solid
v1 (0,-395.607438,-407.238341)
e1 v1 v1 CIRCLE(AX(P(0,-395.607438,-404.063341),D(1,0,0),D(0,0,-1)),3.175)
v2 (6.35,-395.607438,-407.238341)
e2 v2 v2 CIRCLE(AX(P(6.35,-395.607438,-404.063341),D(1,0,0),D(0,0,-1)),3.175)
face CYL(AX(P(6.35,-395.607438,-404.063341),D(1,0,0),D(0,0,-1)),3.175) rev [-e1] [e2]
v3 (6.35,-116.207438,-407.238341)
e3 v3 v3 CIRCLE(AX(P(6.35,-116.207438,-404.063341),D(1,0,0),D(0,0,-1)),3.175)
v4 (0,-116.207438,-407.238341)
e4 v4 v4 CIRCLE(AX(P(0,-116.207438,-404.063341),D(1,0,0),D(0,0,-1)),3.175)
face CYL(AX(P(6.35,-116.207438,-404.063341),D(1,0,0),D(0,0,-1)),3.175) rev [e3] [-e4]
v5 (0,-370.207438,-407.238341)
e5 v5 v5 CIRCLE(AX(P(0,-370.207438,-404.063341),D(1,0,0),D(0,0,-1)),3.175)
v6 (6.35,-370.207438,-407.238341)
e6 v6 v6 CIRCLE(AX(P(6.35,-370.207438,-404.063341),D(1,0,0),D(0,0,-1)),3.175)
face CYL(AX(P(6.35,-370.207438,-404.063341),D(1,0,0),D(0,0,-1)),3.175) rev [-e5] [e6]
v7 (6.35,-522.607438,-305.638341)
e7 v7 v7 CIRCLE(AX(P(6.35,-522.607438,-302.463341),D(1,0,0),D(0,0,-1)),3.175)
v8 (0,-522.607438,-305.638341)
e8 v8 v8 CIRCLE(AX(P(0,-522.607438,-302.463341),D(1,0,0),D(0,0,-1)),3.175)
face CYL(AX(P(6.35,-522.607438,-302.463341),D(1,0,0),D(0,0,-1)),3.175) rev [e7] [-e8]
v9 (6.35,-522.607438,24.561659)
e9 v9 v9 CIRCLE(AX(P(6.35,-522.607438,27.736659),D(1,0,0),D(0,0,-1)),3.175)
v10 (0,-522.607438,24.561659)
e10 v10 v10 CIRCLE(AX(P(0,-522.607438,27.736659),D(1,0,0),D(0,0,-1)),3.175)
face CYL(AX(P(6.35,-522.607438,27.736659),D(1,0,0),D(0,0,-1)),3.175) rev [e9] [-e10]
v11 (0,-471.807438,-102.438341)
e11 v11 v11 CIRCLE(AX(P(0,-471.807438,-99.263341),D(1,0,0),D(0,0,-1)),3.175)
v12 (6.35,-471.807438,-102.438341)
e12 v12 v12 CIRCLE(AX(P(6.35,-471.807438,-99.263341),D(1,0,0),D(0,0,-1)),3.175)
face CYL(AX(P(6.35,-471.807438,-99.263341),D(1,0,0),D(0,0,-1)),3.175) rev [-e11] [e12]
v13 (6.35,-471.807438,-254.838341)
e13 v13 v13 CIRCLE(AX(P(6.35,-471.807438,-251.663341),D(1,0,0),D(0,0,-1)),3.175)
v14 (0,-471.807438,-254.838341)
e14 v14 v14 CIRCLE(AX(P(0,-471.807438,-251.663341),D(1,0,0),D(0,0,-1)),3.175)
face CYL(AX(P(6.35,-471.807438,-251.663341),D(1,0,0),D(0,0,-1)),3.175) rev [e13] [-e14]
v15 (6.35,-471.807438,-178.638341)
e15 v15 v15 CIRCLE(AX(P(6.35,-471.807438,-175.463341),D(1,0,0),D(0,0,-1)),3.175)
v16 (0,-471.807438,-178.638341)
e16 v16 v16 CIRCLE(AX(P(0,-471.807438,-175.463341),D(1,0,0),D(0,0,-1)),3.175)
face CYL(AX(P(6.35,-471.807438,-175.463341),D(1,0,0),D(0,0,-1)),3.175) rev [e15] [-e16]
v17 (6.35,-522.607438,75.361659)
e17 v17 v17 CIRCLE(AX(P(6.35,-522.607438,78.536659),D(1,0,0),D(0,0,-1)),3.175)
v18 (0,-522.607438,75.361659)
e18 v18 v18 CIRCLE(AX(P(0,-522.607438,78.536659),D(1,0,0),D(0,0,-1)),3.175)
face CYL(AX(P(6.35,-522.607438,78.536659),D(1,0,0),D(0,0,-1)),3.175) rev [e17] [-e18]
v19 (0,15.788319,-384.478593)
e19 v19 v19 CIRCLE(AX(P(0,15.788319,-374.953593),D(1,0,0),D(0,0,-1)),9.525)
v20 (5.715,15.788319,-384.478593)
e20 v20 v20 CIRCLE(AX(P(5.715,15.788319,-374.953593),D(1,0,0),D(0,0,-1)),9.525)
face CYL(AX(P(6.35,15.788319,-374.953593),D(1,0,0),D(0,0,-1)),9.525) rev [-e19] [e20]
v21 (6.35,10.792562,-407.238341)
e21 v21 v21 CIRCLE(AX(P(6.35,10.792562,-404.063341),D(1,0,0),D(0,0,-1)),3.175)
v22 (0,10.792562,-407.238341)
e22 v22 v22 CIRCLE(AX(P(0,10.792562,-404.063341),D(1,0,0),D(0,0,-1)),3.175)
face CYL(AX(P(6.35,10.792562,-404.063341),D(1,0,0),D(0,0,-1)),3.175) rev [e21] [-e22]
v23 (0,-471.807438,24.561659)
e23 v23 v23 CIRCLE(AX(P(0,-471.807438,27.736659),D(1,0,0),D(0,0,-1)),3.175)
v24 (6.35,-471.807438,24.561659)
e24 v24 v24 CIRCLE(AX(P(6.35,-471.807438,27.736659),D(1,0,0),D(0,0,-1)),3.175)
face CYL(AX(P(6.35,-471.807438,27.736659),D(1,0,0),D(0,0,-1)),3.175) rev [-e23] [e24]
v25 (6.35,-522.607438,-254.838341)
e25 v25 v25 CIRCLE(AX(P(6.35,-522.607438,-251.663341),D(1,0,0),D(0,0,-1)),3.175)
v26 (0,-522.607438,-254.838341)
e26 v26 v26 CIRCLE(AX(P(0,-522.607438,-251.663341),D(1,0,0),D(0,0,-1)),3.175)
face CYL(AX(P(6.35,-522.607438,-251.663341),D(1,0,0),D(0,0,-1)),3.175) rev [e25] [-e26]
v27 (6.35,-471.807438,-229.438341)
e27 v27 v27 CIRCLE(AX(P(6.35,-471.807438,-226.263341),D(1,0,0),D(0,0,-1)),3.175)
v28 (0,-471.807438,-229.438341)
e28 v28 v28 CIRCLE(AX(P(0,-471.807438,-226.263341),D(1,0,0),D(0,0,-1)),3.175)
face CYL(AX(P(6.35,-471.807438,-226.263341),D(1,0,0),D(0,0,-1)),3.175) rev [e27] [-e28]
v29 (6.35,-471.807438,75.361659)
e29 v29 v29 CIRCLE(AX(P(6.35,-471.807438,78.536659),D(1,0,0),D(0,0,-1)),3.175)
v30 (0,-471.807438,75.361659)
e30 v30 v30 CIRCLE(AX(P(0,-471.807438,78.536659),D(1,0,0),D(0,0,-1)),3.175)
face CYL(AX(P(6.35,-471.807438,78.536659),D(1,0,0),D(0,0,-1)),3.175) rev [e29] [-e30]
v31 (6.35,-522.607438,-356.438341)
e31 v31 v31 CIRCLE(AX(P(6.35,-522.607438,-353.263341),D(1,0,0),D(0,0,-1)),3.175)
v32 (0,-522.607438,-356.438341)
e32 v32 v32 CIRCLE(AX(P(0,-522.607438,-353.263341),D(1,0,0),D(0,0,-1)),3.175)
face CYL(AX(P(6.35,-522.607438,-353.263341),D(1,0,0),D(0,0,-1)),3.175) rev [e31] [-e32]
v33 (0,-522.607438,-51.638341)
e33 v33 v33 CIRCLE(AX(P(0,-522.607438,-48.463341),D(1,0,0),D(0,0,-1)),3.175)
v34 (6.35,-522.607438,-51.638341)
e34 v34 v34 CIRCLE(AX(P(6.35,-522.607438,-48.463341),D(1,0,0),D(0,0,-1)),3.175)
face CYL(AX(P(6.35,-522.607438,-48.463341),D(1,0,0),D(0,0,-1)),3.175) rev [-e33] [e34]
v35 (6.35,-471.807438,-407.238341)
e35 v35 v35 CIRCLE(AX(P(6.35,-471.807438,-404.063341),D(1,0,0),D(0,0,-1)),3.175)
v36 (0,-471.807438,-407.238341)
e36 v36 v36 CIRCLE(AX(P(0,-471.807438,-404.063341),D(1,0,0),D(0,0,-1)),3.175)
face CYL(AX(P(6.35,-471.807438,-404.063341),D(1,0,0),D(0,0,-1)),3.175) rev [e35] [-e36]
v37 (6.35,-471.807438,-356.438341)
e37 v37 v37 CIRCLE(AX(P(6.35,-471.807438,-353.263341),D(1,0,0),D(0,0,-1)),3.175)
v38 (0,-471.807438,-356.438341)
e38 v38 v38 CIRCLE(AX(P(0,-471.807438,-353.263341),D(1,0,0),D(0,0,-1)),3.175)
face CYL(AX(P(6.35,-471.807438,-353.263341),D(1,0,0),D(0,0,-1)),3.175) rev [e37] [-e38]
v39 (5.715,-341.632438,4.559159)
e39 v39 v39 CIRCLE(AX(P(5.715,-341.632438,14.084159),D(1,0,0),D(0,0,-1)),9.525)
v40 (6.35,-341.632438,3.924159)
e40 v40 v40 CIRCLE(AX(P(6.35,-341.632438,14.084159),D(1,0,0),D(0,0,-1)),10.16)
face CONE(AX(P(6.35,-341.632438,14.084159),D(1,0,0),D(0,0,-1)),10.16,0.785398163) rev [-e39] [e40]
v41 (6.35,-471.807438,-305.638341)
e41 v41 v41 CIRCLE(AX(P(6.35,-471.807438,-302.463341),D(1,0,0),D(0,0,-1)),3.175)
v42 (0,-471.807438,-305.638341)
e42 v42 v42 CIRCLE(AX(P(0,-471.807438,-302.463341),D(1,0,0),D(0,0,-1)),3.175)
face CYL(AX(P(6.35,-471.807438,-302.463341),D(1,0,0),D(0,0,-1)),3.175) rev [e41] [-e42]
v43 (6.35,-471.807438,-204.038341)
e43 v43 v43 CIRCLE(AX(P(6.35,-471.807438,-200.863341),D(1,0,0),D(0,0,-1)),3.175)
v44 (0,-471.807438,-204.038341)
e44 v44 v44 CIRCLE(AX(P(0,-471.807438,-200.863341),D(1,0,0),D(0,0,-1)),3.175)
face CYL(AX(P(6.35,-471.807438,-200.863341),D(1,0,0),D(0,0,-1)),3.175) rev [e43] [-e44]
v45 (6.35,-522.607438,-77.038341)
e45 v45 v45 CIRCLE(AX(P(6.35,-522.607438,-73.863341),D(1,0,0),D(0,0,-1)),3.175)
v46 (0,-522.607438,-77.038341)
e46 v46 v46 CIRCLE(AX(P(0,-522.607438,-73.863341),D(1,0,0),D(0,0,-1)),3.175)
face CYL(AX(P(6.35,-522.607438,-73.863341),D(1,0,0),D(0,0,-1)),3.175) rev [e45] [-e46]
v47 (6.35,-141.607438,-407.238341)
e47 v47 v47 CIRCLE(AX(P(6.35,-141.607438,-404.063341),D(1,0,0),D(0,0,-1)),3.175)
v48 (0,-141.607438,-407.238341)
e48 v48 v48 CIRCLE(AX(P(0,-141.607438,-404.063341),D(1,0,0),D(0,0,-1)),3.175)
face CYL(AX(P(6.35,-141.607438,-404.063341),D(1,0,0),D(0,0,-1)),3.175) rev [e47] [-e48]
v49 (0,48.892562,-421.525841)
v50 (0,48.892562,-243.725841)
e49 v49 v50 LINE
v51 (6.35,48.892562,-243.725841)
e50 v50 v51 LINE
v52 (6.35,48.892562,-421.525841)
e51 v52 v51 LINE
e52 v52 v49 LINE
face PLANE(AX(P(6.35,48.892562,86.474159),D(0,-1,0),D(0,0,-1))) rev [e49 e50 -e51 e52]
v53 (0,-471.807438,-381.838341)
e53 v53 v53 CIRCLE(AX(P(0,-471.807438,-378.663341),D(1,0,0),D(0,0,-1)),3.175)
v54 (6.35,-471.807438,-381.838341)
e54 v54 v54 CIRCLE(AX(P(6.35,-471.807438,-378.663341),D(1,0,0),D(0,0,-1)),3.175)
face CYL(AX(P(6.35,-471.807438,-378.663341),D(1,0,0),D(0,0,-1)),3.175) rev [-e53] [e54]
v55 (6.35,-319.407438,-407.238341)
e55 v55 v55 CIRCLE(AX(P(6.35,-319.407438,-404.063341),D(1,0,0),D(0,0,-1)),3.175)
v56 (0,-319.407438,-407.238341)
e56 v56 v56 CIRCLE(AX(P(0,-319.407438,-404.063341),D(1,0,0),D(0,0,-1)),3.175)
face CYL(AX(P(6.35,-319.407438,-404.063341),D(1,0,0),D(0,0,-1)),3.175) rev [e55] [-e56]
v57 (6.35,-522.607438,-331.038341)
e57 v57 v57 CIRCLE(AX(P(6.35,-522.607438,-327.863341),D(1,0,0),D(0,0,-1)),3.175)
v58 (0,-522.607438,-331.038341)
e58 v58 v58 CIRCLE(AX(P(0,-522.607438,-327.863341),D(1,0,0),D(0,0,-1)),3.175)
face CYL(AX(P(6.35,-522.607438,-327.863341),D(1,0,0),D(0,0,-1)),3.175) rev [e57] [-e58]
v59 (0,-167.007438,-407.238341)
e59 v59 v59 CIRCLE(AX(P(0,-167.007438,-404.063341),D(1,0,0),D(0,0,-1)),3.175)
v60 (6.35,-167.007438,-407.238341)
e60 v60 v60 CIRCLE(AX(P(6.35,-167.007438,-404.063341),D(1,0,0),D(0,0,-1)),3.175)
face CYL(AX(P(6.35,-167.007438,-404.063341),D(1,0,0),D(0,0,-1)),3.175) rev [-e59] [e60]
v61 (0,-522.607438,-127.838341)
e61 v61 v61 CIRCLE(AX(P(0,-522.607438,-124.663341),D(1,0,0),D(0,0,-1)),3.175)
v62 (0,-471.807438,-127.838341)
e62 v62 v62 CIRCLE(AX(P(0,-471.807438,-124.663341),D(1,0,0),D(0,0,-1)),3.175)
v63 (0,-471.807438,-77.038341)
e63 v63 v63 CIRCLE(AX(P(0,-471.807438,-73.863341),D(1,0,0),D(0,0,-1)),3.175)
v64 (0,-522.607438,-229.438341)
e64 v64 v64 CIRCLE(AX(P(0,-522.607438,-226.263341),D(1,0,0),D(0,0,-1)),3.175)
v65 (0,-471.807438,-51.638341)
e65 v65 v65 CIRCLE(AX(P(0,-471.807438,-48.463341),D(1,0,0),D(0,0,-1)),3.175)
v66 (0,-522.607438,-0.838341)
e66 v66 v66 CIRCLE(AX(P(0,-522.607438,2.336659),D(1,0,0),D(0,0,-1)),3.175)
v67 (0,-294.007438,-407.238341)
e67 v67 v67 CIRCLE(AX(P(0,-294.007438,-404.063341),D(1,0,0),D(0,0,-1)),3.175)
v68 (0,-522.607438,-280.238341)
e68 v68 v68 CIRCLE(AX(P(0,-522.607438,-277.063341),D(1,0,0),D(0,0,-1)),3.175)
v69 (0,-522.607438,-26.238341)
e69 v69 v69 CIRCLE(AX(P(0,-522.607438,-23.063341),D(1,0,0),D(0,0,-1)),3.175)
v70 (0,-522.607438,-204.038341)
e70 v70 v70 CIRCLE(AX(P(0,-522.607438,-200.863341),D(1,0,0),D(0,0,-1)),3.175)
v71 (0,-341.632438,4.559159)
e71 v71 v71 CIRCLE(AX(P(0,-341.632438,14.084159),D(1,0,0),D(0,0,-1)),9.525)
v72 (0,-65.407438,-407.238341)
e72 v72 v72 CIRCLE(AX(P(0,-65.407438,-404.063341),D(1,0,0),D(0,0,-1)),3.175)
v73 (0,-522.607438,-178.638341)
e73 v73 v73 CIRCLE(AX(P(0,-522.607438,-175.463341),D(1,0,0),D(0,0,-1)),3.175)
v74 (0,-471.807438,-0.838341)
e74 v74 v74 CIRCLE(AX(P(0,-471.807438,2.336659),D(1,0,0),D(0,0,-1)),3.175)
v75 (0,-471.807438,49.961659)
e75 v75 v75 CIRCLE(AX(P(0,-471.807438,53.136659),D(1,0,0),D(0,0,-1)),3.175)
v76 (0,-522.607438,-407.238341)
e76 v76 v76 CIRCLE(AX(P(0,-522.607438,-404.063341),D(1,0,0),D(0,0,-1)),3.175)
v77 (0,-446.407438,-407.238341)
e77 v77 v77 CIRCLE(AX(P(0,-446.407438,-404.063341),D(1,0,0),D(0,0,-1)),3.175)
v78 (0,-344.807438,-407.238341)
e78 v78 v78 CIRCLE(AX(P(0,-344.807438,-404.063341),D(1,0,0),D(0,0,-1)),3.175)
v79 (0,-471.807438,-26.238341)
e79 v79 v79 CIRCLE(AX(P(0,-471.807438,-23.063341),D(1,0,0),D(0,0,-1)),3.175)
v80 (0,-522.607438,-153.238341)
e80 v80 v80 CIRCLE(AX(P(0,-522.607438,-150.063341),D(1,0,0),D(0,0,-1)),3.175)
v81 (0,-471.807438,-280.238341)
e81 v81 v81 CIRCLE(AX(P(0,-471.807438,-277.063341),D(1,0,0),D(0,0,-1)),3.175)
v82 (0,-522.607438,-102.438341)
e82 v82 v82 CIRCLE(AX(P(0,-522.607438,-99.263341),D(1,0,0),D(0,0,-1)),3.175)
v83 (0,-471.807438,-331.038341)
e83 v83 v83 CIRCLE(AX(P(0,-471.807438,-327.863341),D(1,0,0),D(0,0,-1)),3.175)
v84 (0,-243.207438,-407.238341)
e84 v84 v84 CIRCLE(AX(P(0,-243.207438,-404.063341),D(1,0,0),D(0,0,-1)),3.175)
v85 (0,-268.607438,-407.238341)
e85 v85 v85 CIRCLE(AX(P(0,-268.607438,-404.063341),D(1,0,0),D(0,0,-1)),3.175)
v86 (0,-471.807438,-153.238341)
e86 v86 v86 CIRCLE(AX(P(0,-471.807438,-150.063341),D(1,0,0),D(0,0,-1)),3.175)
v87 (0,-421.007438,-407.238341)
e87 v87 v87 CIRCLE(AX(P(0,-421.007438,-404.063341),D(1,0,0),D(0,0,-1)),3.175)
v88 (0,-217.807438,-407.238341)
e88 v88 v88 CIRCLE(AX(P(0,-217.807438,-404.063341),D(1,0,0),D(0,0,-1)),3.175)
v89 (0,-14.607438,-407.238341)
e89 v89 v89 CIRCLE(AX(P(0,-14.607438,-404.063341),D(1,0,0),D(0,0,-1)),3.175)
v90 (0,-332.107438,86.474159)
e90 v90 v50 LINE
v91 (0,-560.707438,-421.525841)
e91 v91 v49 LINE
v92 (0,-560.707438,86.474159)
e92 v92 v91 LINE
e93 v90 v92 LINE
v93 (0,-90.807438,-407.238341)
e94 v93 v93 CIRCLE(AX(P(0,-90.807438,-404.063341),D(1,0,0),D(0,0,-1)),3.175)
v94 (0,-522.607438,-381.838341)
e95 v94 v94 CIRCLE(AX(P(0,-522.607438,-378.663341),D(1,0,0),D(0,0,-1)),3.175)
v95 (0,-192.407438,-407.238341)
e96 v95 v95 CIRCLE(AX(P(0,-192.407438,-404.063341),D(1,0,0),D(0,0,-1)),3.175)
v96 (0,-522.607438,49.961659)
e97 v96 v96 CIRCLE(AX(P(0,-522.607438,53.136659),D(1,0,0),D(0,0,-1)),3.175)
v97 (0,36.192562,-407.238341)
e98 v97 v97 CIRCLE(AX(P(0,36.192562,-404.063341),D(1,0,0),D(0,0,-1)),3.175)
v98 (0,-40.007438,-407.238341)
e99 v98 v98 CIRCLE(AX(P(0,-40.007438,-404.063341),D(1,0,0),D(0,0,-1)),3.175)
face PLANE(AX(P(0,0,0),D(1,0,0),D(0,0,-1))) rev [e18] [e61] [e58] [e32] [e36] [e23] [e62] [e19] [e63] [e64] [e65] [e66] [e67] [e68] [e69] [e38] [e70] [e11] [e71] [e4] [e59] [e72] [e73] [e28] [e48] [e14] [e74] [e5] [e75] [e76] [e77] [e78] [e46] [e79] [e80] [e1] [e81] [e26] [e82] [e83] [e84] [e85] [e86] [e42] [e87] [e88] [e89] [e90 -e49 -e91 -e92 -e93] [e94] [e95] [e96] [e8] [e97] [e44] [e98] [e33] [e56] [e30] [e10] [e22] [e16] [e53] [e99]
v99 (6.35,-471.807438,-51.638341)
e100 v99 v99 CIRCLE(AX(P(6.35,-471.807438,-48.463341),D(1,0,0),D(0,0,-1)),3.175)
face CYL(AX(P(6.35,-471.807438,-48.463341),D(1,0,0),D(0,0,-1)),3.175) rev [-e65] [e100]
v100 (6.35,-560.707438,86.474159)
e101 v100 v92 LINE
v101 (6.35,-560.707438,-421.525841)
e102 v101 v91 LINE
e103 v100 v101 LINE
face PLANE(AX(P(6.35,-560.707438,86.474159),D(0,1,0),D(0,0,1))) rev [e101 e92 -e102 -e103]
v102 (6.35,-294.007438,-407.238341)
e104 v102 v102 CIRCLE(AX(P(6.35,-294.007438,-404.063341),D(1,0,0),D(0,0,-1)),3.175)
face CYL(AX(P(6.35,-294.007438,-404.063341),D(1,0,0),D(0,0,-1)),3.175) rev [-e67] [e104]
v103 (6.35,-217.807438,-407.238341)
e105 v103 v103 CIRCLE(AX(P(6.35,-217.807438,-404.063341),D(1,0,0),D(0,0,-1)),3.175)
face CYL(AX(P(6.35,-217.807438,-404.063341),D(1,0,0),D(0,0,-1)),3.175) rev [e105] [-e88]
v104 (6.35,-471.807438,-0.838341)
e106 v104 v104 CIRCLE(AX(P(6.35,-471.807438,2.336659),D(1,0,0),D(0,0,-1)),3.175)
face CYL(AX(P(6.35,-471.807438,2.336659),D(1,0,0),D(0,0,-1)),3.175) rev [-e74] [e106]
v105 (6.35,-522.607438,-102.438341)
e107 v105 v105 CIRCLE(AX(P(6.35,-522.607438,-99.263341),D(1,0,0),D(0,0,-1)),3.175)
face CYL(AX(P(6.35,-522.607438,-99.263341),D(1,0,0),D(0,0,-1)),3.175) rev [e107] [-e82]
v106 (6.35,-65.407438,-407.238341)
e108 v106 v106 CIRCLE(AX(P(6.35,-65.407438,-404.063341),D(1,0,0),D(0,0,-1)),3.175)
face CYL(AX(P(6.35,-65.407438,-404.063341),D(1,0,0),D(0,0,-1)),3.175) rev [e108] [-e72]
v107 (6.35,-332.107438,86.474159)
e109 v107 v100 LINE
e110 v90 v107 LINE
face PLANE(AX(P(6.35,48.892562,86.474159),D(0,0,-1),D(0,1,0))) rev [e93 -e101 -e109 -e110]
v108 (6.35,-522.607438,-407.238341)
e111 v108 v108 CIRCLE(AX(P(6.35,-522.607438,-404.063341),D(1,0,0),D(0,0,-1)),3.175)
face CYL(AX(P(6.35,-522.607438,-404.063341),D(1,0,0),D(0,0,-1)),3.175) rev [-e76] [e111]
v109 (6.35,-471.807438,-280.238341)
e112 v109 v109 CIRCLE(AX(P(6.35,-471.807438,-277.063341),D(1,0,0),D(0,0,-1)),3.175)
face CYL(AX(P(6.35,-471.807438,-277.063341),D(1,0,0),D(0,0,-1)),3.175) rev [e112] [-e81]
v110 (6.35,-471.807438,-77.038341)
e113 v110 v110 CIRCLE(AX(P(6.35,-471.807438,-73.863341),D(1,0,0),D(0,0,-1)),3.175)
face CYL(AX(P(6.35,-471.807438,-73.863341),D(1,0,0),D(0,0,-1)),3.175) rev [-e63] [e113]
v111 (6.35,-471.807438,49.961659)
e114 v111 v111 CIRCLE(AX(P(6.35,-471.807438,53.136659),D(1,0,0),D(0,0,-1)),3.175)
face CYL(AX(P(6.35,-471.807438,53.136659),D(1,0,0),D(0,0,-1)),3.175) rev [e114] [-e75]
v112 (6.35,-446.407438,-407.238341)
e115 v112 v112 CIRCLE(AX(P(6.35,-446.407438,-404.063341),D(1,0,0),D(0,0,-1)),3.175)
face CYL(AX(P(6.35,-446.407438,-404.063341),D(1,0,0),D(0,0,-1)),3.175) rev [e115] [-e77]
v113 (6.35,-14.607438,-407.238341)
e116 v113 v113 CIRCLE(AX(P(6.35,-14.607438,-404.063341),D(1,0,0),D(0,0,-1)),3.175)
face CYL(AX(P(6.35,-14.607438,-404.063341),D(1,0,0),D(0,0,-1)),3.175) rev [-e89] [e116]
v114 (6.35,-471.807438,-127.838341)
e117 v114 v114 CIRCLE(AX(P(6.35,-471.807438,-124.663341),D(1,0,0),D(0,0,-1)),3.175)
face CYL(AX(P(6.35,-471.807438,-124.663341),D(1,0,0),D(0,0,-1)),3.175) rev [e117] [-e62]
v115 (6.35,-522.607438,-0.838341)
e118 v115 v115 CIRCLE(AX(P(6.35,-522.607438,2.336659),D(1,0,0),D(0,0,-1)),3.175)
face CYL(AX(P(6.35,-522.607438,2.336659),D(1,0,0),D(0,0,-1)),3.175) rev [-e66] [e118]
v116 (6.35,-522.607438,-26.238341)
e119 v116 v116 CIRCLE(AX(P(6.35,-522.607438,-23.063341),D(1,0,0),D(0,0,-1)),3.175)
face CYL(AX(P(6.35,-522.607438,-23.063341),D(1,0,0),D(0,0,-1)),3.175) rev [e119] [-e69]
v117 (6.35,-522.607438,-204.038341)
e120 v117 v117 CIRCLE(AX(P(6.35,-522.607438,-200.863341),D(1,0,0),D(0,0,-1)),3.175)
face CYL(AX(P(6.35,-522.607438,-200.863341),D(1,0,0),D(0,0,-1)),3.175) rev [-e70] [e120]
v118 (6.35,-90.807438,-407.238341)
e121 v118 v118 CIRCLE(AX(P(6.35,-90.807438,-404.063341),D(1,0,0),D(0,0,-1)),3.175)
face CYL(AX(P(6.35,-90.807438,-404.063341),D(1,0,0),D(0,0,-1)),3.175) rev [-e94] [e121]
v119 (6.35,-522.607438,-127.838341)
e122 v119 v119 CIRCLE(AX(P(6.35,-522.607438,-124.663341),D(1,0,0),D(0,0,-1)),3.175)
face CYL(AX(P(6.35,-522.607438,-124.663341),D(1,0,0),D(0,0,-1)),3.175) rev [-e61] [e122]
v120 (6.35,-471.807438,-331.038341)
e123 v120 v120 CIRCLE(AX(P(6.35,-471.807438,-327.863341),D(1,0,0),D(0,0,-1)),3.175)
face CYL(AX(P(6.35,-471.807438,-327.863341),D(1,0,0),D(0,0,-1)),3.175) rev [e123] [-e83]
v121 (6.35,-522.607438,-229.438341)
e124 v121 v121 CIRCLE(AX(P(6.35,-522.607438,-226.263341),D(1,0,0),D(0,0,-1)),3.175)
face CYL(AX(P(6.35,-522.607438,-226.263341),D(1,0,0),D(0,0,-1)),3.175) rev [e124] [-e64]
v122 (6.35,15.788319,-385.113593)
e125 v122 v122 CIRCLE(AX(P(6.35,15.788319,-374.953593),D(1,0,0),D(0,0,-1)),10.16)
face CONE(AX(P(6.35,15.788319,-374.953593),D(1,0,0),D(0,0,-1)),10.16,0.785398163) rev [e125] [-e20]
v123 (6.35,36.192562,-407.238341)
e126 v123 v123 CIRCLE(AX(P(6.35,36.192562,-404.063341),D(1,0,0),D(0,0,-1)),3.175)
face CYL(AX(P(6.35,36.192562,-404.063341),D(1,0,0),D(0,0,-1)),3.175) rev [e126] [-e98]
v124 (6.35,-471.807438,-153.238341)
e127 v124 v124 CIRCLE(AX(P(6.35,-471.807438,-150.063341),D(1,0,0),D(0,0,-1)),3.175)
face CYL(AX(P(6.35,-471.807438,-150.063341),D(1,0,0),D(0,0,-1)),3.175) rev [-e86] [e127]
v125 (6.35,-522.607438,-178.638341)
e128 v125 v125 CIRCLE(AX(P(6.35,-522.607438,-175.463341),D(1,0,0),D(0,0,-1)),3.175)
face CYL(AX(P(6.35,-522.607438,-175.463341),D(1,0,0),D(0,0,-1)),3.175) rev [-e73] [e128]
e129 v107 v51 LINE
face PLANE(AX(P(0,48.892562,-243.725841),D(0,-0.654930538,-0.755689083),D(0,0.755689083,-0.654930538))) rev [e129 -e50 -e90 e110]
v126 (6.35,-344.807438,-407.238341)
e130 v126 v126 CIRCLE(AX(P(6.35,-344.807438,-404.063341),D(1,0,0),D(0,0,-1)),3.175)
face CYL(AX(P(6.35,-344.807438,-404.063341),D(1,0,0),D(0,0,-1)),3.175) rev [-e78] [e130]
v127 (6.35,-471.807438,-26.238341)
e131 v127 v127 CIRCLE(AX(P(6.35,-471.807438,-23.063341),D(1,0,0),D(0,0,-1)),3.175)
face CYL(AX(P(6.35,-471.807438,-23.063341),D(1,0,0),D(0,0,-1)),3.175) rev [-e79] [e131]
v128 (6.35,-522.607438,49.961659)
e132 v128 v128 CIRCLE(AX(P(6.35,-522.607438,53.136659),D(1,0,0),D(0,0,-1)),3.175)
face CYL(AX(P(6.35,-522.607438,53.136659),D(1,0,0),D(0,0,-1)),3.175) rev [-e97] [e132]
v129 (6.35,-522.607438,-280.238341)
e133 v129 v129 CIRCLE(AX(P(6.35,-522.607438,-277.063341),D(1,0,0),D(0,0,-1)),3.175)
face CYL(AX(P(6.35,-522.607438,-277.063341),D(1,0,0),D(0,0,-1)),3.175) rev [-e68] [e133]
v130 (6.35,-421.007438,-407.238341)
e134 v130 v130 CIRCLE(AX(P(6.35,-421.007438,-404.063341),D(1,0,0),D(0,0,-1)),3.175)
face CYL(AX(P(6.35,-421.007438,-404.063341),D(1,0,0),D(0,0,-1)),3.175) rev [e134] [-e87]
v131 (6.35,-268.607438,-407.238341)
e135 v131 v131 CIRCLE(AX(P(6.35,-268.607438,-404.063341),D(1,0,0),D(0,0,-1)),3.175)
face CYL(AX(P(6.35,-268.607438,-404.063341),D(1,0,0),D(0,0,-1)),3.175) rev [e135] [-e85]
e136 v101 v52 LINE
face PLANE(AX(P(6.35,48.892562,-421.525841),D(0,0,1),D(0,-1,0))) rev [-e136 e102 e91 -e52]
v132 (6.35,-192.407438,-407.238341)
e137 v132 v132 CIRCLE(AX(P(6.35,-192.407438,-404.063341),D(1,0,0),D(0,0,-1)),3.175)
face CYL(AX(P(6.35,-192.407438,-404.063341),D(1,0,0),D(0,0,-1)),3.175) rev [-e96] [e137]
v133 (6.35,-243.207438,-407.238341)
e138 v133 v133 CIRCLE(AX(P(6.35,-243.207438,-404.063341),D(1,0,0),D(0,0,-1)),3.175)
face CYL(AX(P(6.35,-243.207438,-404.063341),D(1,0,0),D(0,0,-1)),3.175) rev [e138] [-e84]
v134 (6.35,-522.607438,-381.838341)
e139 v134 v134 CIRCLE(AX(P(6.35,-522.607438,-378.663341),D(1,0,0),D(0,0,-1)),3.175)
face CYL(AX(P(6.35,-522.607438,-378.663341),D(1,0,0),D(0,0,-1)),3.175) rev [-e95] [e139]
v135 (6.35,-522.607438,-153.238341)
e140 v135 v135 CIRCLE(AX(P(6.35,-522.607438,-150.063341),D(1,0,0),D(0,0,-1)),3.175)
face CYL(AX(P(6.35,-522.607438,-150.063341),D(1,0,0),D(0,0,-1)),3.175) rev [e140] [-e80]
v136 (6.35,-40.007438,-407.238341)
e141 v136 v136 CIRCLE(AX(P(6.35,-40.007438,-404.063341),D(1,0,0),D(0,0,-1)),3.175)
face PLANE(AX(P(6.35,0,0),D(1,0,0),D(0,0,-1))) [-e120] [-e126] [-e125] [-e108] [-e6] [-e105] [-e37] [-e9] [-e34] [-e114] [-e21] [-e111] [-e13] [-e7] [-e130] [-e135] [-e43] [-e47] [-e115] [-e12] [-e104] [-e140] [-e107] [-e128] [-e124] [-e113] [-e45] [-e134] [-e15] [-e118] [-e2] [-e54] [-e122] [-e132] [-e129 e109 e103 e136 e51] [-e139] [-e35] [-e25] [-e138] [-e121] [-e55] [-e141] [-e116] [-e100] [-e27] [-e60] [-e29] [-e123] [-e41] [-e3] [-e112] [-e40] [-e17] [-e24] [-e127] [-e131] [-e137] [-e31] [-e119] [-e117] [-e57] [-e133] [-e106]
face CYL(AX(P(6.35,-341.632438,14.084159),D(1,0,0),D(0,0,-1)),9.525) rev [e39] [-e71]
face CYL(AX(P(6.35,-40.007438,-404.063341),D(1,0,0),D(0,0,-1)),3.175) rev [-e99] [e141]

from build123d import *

# Parameters (mm, degrees)
SKETCH1_W                            = 508
SKETCH1_H                            = 609.6
BOSS_EXTRUDE1_DEPTH                  = 6.35
CUT_EXTRUDE1_DEPTH                   = 6.35
F_3_4_0_75_DIAMETER_HOLE1_AT_2_COUNT = 2
F_3_4_0_75_DIAMETER_HOLE1_AT_2_PITCH = 528.299128293
F_1_4_0_25_DIAMETER_HOLE1_D          = 6.35
LPATTERN2_OUTLINE_R                  = 3.175
LPATTERN2_DEPTH                      = 6.35


# Read off the part's stored shape, not the designer's step: LPattern2
with BuildPart() as part:
    # Sketch1 → Boss-Extrude1 (new body)
    with BuildSketch(Plane(origin=(0, 0, 0), x_dir=(0, 0, -1), z_dir=(1, 0, 0))):
        with Locations((167.525841453, -255.907437784)):
            Rectangle(SKETCH1_W, SKETCH1_H)
    extrude(amount=BOSS_EXTRUDE1_DEPTH)

    # Sketch4 → Cut-Extrude1 (cut)
    with BuildSketch(Plane(origin=(6.35, 0, 0), x_dir=(0, 0, -1), z_dir=(1, 0, 0))):
        Polygon((-86.474158547, 48.892562216), (243.725841453, 48.892562216), (-86.474158547, -332.107437784), align=None)
    extrude(amount=-CUT_EXTRUDE1_DEPTH, mode=Mode.SUBTRACT)

    # Sketch6 → 3/4 (0.75) Diameter Hole1 (revolve, cut)
    with BuildSketch(Plane(origin=(6.35, -341.632437784, 14.084158547), x_dir=(0, 0, -1), z_dir=(0, 1, 0))):
        Polygon((0, 0), (0, 6.35), (9.525, 6.35), (9.525, 0.635), (10.16, 0), align=None)
    f_3_4_0_75_diameter_hole1 = revolve(axis=Axis((12.7, -341.632437784, 14.084158547), (-1, 0, 0)), mode=Mode.SUBTRACT)

    # 3/4 (0.75) Diameter Hole1 at 2: 3/4 (0.75) Diameter Hole1 ×2
    with Locations(*[Vector(0, 0.6765499642400948, -0.7363967313118156) * (i * F_3_4_0_75_DIAMETER_HOLE1_AT_2_PITCH) for i in range(1, F_3_4_0_75_DIAMETER_HOLE1_AT_2_COUNT)]):
        add(f_3_4_0_75_diameter_hole1, mode=Mode.SUBTRACT)

    # 1/4 (0.25) Diameter Hole1 (through all)
    with Locations(Plane(origin=(6.35, 0, 0), x_dir=(0, 0, -1), z_dir=(1, 0, 0))):
        with Locations((-78.536658547, -522.607437784), (-78.536658547, -471.807437784), (-53.136658547, -522.607437784), (-53.136658547, -471.807437784), (-27.736658547, -522.607437784), (-27.736658547, -471.807437784), (-2.336658547, -522.607437784), (-2.336658547, -471.807437784), (23.063341453, -522.607437784), (23.063341453, -471.807437784), (48.463341453, -522.607437784), (48.463341453, -471.807437784), (73.863341453, -522.607437784), (73.863341453, -471.807437784), (99.263341453, -522.607437784), (99.263341453, -471.807437784), (124.663341453, -522.607437784), (124.663341453, -471.807437784), (150.063341453, -522.607437784), (150.063341453, -471.807437784), (175.463341453, -522.607437784), (175.463341453, -471.807437784), (200.863341453, -522.607437784), (200.863341453, -471.807437784), (226.263341453, -522.607437784), (226.263341453, -471.807437784), (251.663341453, -522.607437784), (251.663341453, -471.807437784), (277.063341453, -522.607437784), (277.063341453, -471.807437784), (302.463341453, -522.607437784), (302.463341453, -471.807437784), (327.863341453, -522.607437784), (327.863341453, -471.807437784), (353.263341453, -522.607437784), (353.263341453, -471.807437784), (378.663341453, -522.607437784), (378.663341453, -471.807437784), (404.063341453, -522.607437784), (404.063341453, -471.807437784)):
            Hole(F_1_4_0_25_DIAMETER_HOLE1_D / 2)

    # LPattern2 outline → LPattern2 (cut)
    with BuildSketch(Plane.YZ):
        with Locations((36.192562216, -404.063341453)):
            Circle(LPATTERN2_OUTLINE_R)
        with Locations((10.792562216, -404.063341453)):
            Circle(LPATTERN2_OUTLINE_R)
        with Locations((-14.607437784, -404.063341453)):
            Circle(LPATTERN2_OUTLINE_R)
        with Locations((-40.007437784, -404.063341453)):
            Circle(LPATTERN2_OUTLINE_R)
        with Locations((-65.407437784, -404.063341453)):
            Circle(LPATTERN2_OUTLINE_R)
        with Locations((-90.807437784, -404.063341453)):
            Circle(LPATTERN2_OUTLINE_R)
        with Locations((-116.207437784, -404.063341453)):
            Circle(LPATTERN2_OUTLINE_R)
        with Locations((-141.607437784, -404.063341453)):
            Circle(LPATTERN2_OUTLINE_R)
        with Locations((-167.007437784, -404.063341453)):
            Circle(LPATTERN2_OUTLINE_R)
        with Locations((-192.407437784, -404.063341453)):
            Circle(LPATTERN2_OUTLINE_R)
        with Locations((-217.807437784, -404.063341453)):
            Circle(LPATTERN2_OUTLINE_R)
        with Locations((-243.207437784, -404.063341453)):
            Circle(LPATTERN2_OUTLINE_R)
        with Locations((-268.607437784, -404.063341453)):
            Circle(LPATTERN2_OUTLINE_R)
        with Locations((-294.007437784, -404.063341453)):
            Circle(LPATTERN2_OUTLINE_R)
        with Locations((-319.407437784, -404.063341453)):
            Circle(LPATTERN2_OUTLINE_R)
        with Locations((-344.807437784, -404.063341453)):
            Circle(LPATTERN2_OUTLINE_R)
        with Locations((-370.207437784, -404.063341453)):
            Circle(LPATTERN2_OUTLINE_R)
        with Locations((-395.607437784, -404.063341453)):
            Circle(LPATTERN2_OUTLINE_R)
        with Locations((-421.007437784, -404.063341453)):
            Circle(LPATTERN2_OUTLINE_R)
        with Locations((-446.407437784, -404.063341453)):
            Circle(LPATTERN2_OUTLINE_R)
    extrude(amount=LPATTERN2_DEPTH, mode=Mode.SUBTRACT)


solid = part.part
